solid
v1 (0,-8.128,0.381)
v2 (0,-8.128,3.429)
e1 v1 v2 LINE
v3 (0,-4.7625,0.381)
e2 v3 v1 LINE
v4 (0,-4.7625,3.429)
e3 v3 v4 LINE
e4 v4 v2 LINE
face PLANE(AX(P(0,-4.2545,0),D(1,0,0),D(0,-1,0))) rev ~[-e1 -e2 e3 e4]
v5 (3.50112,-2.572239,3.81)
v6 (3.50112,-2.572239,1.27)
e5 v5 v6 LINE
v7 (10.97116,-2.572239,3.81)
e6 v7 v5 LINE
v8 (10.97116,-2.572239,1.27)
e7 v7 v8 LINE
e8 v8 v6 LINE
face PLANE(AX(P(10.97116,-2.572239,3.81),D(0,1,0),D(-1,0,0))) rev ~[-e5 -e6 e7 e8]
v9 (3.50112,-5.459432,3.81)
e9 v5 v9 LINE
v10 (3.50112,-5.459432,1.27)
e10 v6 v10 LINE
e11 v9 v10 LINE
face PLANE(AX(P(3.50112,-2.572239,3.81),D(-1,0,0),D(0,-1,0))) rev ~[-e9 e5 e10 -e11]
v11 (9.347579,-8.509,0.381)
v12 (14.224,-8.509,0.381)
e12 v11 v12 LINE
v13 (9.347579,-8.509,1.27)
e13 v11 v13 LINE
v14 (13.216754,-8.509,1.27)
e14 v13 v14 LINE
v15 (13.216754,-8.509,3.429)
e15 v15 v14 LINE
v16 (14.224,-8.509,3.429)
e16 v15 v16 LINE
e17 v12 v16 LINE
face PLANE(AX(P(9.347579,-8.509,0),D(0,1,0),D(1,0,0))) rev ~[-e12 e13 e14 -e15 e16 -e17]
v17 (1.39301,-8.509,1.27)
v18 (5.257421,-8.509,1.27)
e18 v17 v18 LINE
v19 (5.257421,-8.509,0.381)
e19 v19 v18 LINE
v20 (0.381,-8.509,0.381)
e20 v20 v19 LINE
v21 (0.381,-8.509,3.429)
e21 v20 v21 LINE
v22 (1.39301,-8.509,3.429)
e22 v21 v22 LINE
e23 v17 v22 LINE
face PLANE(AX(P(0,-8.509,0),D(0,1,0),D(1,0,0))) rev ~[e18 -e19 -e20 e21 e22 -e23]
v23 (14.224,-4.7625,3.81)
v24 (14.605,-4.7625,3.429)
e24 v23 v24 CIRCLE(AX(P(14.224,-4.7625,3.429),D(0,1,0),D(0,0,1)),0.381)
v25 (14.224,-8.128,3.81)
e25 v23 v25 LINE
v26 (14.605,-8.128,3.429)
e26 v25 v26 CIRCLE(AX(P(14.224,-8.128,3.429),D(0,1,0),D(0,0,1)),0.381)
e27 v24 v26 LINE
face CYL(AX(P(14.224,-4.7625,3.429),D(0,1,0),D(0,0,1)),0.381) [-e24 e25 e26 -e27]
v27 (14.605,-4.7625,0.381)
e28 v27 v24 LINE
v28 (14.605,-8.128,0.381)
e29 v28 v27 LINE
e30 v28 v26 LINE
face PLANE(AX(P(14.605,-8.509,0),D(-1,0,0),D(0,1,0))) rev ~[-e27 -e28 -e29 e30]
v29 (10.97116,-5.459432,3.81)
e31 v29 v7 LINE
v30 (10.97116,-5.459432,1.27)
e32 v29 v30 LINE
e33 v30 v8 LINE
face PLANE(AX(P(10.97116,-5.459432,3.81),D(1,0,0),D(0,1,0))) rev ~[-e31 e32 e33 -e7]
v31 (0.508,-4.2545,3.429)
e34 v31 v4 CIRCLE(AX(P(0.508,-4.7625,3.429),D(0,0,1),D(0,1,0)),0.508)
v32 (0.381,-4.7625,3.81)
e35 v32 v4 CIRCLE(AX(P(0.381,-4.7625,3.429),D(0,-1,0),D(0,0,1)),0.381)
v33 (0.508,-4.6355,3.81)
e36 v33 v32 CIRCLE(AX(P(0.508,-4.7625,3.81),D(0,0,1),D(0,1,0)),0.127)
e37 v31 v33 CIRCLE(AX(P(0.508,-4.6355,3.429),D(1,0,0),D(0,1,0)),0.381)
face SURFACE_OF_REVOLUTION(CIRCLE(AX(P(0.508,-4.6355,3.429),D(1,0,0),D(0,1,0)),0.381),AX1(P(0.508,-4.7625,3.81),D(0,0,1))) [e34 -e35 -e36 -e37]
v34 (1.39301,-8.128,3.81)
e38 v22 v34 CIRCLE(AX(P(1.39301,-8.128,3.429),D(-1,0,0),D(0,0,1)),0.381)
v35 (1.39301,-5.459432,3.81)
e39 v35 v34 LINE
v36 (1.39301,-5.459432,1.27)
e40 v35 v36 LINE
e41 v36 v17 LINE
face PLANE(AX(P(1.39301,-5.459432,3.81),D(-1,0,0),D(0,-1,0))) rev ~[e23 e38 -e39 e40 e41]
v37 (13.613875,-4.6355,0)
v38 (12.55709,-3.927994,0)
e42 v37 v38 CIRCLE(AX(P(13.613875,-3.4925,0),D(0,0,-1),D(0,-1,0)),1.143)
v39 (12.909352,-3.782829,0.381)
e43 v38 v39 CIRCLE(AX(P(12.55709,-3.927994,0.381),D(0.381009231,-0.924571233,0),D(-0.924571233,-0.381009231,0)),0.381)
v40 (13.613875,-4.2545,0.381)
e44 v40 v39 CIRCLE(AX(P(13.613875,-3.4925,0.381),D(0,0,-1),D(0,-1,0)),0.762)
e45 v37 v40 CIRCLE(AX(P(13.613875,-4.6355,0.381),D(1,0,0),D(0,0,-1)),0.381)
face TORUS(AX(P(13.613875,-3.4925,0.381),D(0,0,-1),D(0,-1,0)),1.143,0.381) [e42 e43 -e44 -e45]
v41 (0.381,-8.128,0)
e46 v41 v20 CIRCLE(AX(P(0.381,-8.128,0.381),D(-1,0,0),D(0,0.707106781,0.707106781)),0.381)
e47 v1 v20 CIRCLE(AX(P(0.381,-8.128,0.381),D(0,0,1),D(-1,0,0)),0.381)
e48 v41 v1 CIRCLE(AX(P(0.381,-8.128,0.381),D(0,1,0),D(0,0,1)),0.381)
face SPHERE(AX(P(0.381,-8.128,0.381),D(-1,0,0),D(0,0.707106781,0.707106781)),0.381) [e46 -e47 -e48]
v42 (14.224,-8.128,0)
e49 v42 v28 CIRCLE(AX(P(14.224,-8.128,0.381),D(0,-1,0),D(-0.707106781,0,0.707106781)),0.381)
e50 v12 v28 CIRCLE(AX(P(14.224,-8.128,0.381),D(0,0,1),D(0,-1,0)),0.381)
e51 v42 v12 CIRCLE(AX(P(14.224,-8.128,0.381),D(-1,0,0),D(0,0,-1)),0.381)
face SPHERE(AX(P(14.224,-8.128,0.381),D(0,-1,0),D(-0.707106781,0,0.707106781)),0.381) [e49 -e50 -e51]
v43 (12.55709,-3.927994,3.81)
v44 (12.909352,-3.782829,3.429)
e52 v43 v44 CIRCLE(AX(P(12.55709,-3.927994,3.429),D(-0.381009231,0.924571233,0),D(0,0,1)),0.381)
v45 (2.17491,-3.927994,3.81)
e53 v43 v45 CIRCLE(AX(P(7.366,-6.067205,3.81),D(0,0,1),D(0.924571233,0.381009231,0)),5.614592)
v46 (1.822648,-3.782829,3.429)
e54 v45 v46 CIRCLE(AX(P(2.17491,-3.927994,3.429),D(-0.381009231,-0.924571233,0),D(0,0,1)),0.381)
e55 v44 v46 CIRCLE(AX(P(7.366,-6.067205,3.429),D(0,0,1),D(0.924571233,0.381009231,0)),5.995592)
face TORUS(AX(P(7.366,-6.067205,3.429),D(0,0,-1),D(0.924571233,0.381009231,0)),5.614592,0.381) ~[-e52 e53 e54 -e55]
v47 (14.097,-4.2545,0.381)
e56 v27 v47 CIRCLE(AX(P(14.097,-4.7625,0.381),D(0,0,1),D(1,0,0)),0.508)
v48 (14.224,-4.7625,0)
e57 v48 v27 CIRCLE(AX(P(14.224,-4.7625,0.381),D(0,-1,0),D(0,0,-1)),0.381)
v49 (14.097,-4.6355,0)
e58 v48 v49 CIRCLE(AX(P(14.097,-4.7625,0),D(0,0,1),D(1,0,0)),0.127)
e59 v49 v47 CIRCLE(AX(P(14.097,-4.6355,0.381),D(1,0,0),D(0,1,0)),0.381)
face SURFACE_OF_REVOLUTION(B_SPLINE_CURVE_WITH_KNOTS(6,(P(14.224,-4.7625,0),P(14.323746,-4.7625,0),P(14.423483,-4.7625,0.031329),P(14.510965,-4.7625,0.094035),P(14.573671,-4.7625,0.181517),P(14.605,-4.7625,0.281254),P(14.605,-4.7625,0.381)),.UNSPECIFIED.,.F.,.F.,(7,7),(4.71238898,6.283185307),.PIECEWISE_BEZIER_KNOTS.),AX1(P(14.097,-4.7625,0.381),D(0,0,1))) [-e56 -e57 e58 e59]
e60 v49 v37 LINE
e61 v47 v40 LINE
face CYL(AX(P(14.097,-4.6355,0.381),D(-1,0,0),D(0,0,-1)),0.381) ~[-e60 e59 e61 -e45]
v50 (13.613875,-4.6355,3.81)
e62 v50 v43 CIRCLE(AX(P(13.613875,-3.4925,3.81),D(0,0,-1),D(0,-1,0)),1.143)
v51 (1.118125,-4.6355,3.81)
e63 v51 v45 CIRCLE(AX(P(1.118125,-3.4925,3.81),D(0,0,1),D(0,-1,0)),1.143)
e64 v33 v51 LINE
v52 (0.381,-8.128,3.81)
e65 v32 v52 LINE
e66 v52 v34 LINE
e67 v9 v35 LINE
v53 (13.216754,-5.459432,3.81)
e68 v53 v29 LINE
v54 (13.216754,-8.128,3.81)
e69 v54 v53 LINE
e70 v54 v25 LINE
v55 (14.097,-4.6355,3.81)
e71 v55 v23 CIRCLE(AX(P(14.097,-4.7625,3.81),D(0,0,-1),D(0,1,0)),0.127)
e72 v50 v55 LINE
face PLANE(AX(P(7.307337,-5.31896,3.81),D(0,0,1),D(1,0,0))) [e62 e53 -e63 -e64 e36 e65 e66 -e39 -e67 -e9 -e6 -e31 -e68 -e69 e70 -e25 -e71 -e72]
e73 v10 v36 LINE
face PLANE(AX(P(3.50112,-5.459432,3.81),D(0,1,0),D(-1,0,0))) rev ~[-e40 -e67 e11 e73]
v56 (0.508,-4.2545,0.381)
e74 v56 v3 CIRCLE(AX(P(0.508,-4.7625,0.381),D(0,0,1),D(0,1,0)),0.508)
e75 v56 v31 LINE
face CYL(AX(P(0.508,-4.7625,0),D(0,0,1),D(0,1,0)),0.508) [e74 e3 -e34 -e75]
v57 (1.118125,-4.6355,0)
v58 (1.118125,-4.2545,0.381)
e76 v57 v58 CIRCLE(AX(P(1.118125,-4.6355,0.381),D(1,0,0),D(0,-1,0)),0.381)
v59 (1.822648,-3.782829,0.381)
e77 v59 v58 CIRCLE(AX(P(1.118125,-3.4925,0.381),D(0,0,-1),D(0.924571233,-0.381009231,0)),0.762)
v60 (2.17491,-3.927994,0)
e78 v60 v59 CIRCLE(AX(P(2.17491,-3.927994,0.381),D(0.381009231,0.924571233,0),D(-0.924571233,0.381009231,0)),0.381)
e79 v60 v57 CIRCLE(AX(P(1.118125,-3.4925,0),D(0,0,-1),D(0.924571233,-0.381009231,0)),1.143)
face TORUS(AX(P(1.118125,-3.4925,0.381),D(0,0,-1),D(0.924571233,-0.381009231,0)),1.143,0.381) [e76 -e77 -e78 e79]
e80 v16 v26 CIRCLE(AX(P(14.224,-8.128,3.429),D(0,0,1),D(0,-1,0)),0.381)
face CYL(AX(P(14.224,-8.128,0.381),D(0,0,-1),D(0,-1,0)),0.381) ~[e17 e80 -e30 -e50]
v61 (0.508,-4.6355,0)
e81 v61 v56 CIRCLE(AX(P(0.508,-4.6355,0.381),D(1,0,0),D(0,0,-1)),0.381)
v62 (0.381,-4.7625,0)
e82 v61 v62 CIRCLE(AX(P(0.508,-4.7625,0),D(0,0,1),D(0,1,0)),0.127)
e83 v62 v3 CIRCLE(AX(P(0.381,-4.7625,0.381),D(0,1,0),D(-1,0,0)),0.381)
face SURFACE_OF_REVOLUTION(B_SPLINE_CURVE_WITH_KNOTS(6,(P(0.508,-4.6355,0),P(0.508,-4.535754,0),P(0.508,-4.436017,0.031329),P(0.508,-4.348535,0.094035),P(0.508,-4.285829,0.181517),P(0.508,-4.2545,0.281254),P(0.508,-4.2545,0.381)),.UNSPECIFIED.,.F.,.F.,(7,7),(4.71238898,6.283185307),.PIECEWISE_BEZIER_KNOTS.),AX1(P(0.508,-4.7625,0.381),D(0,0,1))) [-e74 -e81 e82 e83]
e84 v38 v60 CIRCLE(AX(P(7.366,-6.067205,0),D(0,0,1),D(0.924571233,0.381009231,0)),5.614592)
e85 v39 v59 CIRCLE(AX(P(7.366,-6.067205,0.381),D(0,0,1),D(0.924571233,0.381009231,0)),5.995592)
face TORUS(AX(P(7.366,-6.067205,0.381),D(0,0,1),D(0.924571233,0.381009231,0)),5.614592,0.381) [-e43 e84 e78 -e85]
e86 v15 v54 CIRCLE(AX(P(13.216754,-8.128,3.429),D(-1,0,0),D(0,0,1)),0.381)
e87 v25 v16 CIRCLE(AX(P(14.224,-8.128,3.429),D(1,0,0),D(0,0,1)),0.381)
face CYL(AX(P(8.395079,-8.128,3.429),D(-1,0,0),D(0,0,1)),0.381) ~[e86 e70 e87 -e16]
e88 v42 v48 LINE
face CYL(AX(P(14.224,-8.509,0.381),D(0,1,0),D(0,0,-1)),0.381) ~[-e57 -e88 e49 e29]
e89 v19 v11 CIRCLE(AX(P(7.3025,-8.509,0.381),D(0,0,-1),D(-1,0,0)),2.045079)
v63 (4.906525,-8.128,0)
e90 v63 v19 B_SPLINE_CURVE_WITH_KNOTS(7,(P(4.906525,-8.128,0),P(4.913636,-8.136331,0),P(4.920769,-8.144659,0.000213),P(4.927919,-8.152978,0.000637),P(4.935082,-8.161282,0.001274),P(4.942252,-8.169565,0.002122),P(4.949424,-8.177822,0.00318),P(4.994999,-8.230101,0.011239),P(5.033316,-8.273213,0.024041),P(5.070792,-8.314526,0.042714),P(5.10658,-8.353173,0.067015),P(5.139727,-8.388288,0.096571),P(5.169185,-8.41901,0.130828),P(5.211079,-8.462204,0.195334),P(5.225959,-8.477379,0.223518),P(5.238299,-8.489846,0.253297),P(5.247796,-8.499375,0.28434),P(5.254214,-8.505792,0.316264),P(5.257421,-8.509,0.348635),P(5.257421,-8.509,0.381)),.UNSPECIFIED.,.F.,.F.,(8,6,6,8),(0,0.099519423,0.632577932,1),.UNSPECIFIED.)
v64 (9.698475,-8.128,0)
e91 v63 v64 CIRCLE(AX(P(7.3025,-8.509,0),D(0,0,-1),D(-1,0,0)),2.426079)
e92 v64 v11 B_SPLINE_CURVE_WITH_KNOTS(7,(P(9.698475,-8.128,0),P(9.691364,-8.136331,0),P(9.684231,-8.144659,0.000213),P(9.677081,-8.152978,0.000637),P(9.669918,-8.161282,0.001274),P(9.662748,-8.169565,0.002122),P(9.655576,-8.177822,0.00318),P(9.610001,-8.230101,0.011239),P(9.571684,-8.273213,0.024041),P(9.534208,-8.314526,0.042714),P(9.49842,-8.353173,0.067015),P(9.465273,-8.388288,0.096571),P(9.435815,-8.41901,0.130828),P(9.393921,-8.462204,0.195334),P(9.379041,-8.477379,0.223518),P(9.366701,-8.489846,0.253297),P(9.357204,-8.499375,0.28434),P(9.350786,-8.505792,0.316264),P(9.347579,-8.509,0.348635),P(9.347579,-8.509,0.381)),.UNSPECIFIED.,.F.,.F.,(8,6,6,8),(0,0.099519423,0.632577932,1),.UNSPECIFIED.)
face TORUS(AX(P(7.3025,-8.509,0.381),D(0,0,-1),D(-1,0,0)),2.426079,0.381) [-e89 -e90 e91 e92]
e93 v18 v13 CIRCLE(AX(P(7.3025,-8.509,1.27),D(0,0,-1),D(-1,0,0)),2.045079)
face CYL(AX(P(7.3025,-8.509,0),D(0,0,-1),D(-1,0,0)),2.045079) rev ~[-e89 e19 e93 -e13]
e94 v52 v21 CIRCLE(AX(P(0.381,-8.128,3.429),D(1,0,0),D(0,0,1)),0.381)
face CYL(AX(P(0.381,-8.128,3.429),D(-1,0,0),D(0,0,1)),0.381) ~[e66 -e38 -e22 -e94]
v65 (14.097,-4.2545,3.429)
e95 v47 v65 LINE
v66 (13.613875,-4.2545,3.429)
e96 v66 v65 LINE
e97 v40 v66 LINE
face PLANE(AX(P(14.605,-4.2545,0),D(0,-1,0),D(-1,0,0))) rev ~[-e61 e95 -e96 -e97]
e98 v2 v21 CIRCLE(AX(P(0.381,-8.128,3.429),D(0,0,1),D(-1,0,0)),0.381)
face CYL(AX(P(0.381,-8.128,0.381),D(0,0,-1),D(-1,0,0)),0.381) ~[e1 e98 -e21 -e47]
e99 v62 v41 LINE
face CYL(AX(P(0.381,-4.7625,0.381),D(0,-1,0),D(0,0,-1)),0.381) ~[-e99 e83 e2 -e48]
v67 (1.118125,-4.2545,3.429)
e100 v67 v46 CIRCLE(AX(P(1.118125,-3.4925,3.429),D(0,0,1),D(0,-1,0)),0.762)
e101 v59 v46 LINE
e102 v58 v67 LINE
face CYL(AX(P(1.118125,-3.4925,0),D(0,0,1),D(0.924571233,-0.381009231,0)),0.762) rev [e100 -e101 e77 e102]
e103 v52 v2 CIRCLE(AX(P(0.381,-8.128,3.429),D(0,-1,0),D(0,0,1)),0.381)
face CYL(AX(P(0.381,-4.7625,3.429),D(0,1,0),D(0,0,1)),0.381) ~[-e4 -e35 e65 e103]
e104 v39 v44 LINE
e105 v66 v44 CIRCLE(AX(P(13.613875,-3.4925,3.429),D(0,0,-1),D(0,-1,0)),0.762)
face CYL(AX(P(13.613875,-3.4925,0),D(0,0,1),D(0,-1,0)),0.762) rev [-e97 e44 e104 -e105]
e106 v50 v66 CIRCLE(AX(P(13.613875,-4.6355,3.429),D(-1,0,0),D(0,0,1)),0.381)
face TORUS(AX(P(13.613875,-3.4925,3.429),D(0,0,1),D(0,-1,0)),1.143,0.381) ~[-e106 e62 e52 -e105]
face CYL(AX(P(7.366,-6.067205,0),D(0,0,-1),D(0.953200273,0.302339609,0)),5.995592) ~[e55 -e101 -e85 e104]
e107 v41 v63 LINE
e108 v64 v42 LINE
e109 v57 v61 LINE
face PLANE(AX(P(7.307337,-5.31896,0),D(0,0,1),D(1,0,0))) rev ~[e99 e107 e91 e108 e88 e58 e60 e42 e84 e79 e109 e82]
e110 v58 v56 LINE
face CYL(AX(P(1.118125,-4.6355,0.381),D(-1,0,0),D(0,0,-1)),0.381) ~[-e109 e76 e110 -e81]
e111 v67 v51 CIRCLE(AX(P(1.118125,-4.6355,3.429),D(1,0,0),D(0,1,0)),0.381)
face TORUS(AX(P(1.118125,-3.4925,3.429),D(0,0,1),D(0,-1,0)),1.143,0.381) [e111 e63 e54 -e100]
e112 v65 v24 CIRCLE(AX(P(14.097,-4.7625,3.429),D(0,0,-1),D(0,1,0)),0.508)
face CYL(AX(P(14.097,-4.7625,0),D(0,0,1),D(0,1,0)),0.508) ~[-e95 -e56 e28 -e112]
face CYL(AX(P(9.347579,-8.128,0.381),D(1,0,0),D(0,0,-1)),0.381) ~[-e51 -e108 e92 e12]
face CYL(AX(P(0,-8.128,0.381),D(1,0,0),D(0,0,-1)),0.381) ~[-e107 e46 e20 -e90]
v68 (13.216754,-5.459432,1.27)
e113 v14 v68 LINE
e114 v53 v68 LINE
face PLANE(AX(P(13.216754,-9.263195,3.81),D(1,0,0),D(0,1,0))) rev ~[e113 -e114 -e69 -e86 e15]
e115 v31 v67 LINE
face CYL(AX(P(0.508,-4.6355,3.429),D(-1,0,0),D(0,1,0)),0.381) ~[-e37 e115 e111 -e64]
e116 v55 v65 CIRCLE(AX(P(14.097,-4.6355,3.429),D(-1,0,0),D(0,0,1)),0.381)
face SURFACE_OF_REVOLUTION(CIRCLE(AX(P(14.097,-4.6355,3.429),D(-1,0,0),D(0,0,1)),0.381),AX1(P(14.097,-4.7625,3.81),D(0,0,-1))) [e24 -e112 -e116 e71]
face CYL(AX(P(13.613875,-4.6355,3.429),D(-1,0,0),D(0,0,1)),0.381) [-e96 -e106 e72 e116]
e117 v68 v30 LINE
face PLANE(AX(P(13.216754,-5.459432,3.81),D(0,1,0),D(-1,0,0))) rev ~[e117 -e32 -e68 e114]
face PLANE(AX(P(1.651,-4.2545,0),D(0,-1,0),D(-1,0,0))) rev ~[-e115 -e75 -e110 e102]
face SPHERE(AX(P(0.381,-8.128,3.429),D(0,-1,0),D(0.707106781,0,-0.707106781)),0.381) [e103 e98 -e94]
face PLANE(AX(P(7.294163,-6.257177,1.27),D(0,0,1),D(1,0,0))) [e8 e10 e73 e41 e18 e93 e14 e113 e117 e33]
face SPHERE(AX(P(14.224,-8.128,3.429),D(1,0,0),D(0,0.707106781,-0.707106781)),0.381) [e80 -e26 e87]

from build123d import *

# Parameters (mm, degrees)
F1_DEPTH     = 3.81
F2_R         = 0.762
F3_R         = 0.508
F4_R         = 0.381
F5_T1_DEPTH  = 0.6101247647
F5_T3_DEPTH  = 3.3655
F5_T5_DEPTH  = 5.8289214894
F5_T7_DEPTH  = 0.4831247647
F5_T9_DEPTH  = 5.8289214894
F5_T11_DEPTH = 3.048
F5_S15_W     = 0.381
F5_S15_H     = 0.381
F5_T16_DEPTH = 0.381
F5_S21_W     = 0.381
F5_S21_H     = 0.381
F5_T22_DEPTH = 0.381
F5_S27_W     = 0.381
F5_S27_H     = 0.381
F5_T28_DEPTH = 0.381
F5_S33_W     = 0.381
F5_S33_H     = 0.381
F5_T34_DEPTH = 0.381
F5_T38_ANGLE = 90
F5_T40_ANGLE = 67.60378922
F5_T42_ANGLE = 135.20757844
F5_T44_ANGLE = 67.60378922
F5_T46_ANGLE = 233.4571121673
F5_T48_ANGLE = 90
F7_DEPTH     = 2.54


# Not quite as in the source:
# - a fillet or chamfer that OpenCascade refuses, or shapes differently, is made with other operations: its cross-section is extruded or revolved along the edge and cut away or added


with BuildPart() as f1:
    # F0 (on Top) → F1 (new body)
    with BuildSketch(Plane.XY):
        with BuildLine():
            Line((0, -4.2545), (0, -8.509))
            Line((0, -8.509), (5.2574214894, -8.509))
            ThreePointArc((5.2574214894, -8.509), (7.3025, -6.4639214894), (9.3475785106, -8.509))
            Line((9.3475785106, -8.509), (14.605, -8.509))
            Line((14.605, -8.509), (14.605, -4.2545))
            Line((14.605, -4.2545), (13.081, -4.2545))
            ThreePointArc((13.081, -4.2545), (7.366, -0.0716128896), (1.651, -4.2545))
            Line((1.651, -4.2545), (0, -4.2545))
        make_face()
    extrude(amount=F1_DEPTH)

    # F2
    f2_edges = [f1.edges().sort_by_distance(p)[0] for p in [
        (13.081, -4.2545, 1.905),
        (1.651, -4.2545, 1.905),
    ]]
    fillet(f2_edges, radius=F2_R)

    # F3
    f3_edges = [f1.edges().sort_by_distance(p)[0] for p in [
        (0, -4.2545, 1.905),
        (14.605, -4.2545, 1.905),
    ]]
    fillet(f3_edges, radius=F3_R)

    # F4
    f4_edges = [f1.edges().sort_by_distance(p)[0] for p in [
        (0.813062, -4.2545, 0),
        (0.14879, -4.40329, 0),
        (1.542043, -4.125696, 0),
        (0, -6.63575, 0),
        (7.366, -0.071613, 0),
        (2.628711, -8.509, 0),
        (13.189957, -4.125696, 0),
        (7.3025, -6.463921, 0),
        (13.855438, -4.2545, 0),
        (11.976289, -8.509, 0),
        (14.45621, -4.40329, 0),
        (14.605, -6.63575, 0),
    ]]
    fillet(f4_edges, radius=F4_R)

    # F5: fillet of radius 0.381 on 14 edges, made by hand

    # F5_s2 → F5_t1 (cut)
    with BuildSketch(Plane.YZ.offset(0.508)):
        with BuildLine():
            ThreePointArc((-4.2545, 3.429), (-4.3660923164, 3.6984076836), (-4.6355, 3.81))
            Line((-4.6355, 3.81), (-4.2545, 3.81))
            Line((-4.2545, 3.81), (-4.2545, 3.429))
        make_face()
    extrude(amount=F5_T1_DEPTH, mode=Mode.SUBTRACT)

    # F5_s4 → F5_t3 (cut)
    with BuildSketch(Plane.XZ.offset(4.7625)):
        with BuildLine():
            ThreePointArc((0.381, 3.81), (0.1115923164, 3.6984076836), (0, 3.429))
            Line((0, 3.429), (0, 3.81))
            Line((0, 3.81), (0.381, 3.81))
        make_face()
        with BuildLine():
            ThreePointArc((14.224, 3.81), (14.4934076836, 3.6984076836), (14.605, 3.429))
            Line((14.605, 3.429), (14.605, 3.81))
            Line((14.605, 3.81), (14.224, 3.81))
        make_face()
    extrude(amount=F5_T3_DEPTH, mode=Mode.SUBTRACT)

    # F5_s6 → F5_t5 (cut)
    with BuildSketch(Plane.YZ.offset(0.381)):
        with BuildLine():
            ThreePointArc((-8.128, 3.81), (-8.3974076836, 3.6984076836), (-8.509, 3.429))
            Line((-8.509, 3.429), (-8.509, 3.81))
            Line((-8.509, 3.81), (-8.128, 3.81))
        make_face()
    extrude(amount=F5_T5_DEPTH, mode=Mode.SUBTRACT)

    # F5_s8 → F5_t7 (cut)
    with BuildSketch(Plane.YZ.offset(13.6138752353)):
        with BuildLine():
            ThreePointArc((-4.6355, 3.81), (-4.3660923164, 3.6984076836), (-4.2545, 3.429))
            Line((-4.2545, 3.429), (-4.2545, 3.81))
            Line((-4.2545, 3.81), (-4.6355, 3.81))
        make_face()
    extrude(amount=F5_T7_DEPTH, mode=Mode.SUBTRACT)

    # F5_s10 → F5_t9 (cut)
    with BuildSketch(Plane.YZ.offset(8.3950785106)):
        with BuildLine():
            ThreePointArc((-8.128, 3.81), (-8.3974076836, 3.6984076836), (-8.509, 3.429))
            Line((-8.509, 3.429), (-8.509, 3.81))
            Line((-8.509, 3.81), (-8.128, 3.81))
        make_face()
    extrude(amount=F5_T9_DEPTH, mode=Mode.SUBTRACT)

    # F5_s12 → F5_t11 (cut)
    with BuildSketch(Plane.XY.offset(0.381)):
        with BuildLine():
            ThreePointArc((0, -8.128), (0.1115923164, -8.3974076836), (0.381, -8.509))
            Line((0.381, -8.509), (0, -8.509))
            Line((0, -8.509), (0, -8.128))
        make_face()
        with BuildLine():
            ThreePointArc((14.224, -8.509), (14.4934076836, -8.3974076836), (14.605, -8.128))
            Line((14.605, -8.128), (14.605, -8.509))
            Line((14.605, -8.509), (14.224, -8.509))
        make_face()
    extrude(amount=F5_T11_DEPTH, mode=Mode.SUBTRACT)


with BuildPart() as f5_tool14:
    # F5_s15 → F5_t16 (new body)
    with BuildSketch(Plane.XZ.offset(8.128)):
        with Locations((14.4145, 0.1905)):
            Rectangle(F5_S15_W, F5_S15_H)
    extrude(amount=F5_T16_DEPTH)

    # F5_s17 → F5_t18 (revolve, cut)
    with BuildSketch(Plane(origin=(14.224, -8.128, 0.381), x_dir=(-0.7071067812, 0, 0.7071067812), z_dir=(0.7071067812, 0, 0.7071067812))):
        with BuildLine():
            ThreePointArc((0, -0.381), (0.381, 0), (0, 0.381))
            Line((0, 0.381), (0, -0.381))
        make_face()
    revolve(axis=Axis((14.224, -8.128, 0.381), (0, -1, 0)), mode=Mode.SUBTRACT)


with BuildPart() as f1_1:
    add(f1.part)

    # F5_t13: cut F5_tool14
    add(f5_tool14.part, mode=Mode.SUBTRACT)


with BuildPart() as f5_tool20:
    # F5_s21 → F5_t22 (new body)
    with BuildSketch(Plane.YZ.offset(0.381)):
        with Locations((-8.3185, 0.1905)):
            Rectangle(F5_S21_W, F5_S21_H)
    extrude(amount=-F5_T22_DEPTH)

    # F5_s23 → F5_t24 (revolve, cut)
    with BuildSketch(Plane(origin=(0.381, -8.128, 0.381), x_dir=(0, 0.7071067812, 0.7071067812), z_dir=(0, -0.7071067812, 0.7071067812))):
        with BuildLine():
            ThreePointArc((0, -0.381), (0.381, 0), (0, 0.381))
            Line((0, 0.381), (0, -0.381))
        make_face()
    revolve(axis=Axis((0.381, -8.128, 0.381), (-1, 0, 0)), mode=Mode.SUBTRACT)


with BuildPart() as f1_2:
    add(f1_1.part)

    # F5_t19: cut F5_tool20
    add(f5_tool20.part, mode=Mode.SUBTRACT)


with BuildPart() as f5_tool26:
    # F5_s27 → F5_t28 (new body)
    with BuildSketch(Plane.XZ.offset(8.128)):
        with Locations((0.1905, 3.6195)):
            Rectangle(F5_S27_W, F5_S27_H)
    extrude(amount=F5_T28_DEPTH)

    # F5_s29 → F5_t30 (revolve, cut)
    with BuildSketch(Plane(origin=(0.381, -8.128, 3.429), x_dir=(0.7071067812, 0, -0.7071067812), z_dir=(-0.7071067812, 0, -0.7071067812))):
        with BuildLine():
            ThreePointArc((0, -0.381), (0.381, 0), (0, 0.381))
            Line((0, 0.381), (0, -0.381))
        make_face()
    revolve(axis=Axis((0.381, -8.128, 3.429), (0, -1, 0)), mode=Mode.SUBTRACT)


with BuildPart() as f1_3:
    add(f1_2.part)

    # F5_t25: cut F5_tool26
    add(f5_tool26.part, mode=Mode.SUBTRACT)


with BuildPart() as f5_tool32:
    # F5_s33 → F5_t34 (new body)
    with BuildSketch(Plane.YZ.offset(14.224)):
        with Locations((-8.3185, 3.6195)):
            Rectangle(F5_S33_W, F5_S33_H)
    extrude(amount=F5_T34_DEPTH)

    # F5_s35 → F5_t36 (revolve, cut)
    with BuildSketch(Plane(origin=(14.224, -8.128, 3.429), x_dir=(0, 0.7071067812, -0.7071067812), z_dir=(0, -0.7071067812, -0.7071067812))):
        with BuildLine():
            ThreePointArc((0, -0.381), (0.381, 0), (0, 0.381))
            Line((0, 0.381), (0, -0.381))
        make_face()
    revolve(axis=Axis((14.224, -8.128, 3.429), (1, 0, 0)), mode=Mode.SUBTRACT)


with BuildPart() as f1_4:
    add(f1_3.part)

    # F5_t31: cut F5_tool32
    add(f5_tool32.part, mode=Mode.SUBTRACT)

    # F5_s37 → F5_t38 (revolve, cut)
    with BuildSketch(Plane.YZ.offset(0.508)):
        with BuildLine():
            ThreePointArc((-4.2545, 3.429), (-4.3660923164, 3.6984076836), (-4.6355, 3.81))
            Line((-4.6355, 3.81), (-4.2545, 3.81))
            Line((-4.2545, 3.81), (-4.2545, 3.429))
        make_face()
    revolve(axis=Axis((0.508, -4.7625, 3.81), (0, 0, 1)), revolution_arc=F5_T38_ANGLE, mode=Mode.SUBTRACT)

    # F5_s39 → F5_t40 (revolve, cut)
    with BuildSketch(Plane.YZ.offset(1.1181247647)):
        with BuildLine():
            ThreePointArc((-4.6355, 3.81), (-4.3660923164, 3.6984076836), (-4.2545, 3.429))
            Line((-4.2545, 3.429), (-4.2545, 3.81))
            Line((-4.2545, 3.81), (-4.6355, 3.81))
        make_face()
    revolve(axis=Axis((1.1181247647, -3.4925, 3.81), (0, 0, 1)), revolution_arc=F5_T40_ANGLE, mode=Mode.SUBTRACT)

    # F5_s41 → F5_t42 (revolve, cut)
    with BuildSketch(Plane(origin=(3.2066030929, -7.7812628503, 0), x_dir=(0, 0, 1), z_dir=(0.3810092313, -0.9245712334, 0))):
        with BuildLine():
            ThreePointArc((3.81, -10.113322678), (3.6984076836, -10.3827303617), (3.429, -10.494322678))
            Line((3.429, -10.494322678), (3.81, -10.494322678))
            Line((3.81, -10.494322678), (3.81, -10.113322678))
        make_face()
    revolve(axis=Axis((7.366, -6.0672049597, 3.81), (0, 0, 1)), revolution_arc=F5_T42_ANGLE, mode=Mode.SUBTRACT)

    # F5_s43 → F5_t44 (revolve, cut)
    with BuildSketch(Plane.YZ.offset(13.6138752353)):
        with BuildLine():
            ThreePointArc((-4.6355, 3.81), (-4.3660923164, 3.6984076836), (-4.2545, 3.429))
            Line((-4.2545, 3.429), (-4.2545, 3.81))
            Line((-4.2545, 3.81), (-4.6355, 3.81))
        make_face()
    revolve(axis=Axis((13.6138752353, -3.4925, 3.81), (0, 0, -1)), revolution_arc=F5_T44_ANGLE, mode=Mode.SUBTRACT)

    # F5_s45 → F5_t46 (revolve, cut)
    with BuildSketch(Plane(origin=(4.8953206605, -9.721188669, 0), x_dir=(0, 0, 1), z_dir=(0.449764197, -0.8931473378, 0))):
        with BuildLine():
            ThreePointArc((3.81, -0.2690863714), (3.6984076836, -0.5384940551), (3.429, -0.6500863714))
            Line((3.429, -0.6500863714), (3.81, -0.6500863714))
            Line((3.81, -0.6500863714), (3.81, -0.2690863714))
        make_face()
    revolve(axis=Axis((7.3025, -8.509, 3.81), (0, 0, -1)), revolution_arc=F5_T46_ANGLE, mode=Mode.SUBTRACT)

    # F5_s47 → F5_t48 (revolve, cut)
    with BuildSketch(Plane.YZ.offset(14.097)):
        with BuildLine():
            ThreePointArc((-4.6355, 3.81), (-4.3660923164, 3.6984076836), (-4.2545, 3.429))
            Line((-4.2545, 3.429), (-4.2545, 3.81))
            Line((-4.2545, 3.81), (-4.6355, 3.81))
        make_face()
    revolve(axis=Axis((14.097, -4.7625, 3.81), (0, 0, -1)), revolution_arc=F5_T48_ANGLE, mode=Mode.SUBTRACT)

    # F6 (on face) → F7 (cut)
    with BuildSketch(Plane.XY.offset(3.81)):
        Polygon((1.3930101413, -5.4594320245), (1.3930101413, -8.8049108163), (1.3930101413, -9.2631950974), (13.2167544216, -9.2631950974), (13.2167544216, -5.4594320245), (10.9711596742, -5.4594320245), (10.9711596742, -2.5722389109), (3.5011197906, -2.5722389109), (3.5011197906, -5.4594320245), align=None)
    extrude(amount=-F7_DEPTH, mode=Mode.SUBTRACT)


solid = f1_4.part
